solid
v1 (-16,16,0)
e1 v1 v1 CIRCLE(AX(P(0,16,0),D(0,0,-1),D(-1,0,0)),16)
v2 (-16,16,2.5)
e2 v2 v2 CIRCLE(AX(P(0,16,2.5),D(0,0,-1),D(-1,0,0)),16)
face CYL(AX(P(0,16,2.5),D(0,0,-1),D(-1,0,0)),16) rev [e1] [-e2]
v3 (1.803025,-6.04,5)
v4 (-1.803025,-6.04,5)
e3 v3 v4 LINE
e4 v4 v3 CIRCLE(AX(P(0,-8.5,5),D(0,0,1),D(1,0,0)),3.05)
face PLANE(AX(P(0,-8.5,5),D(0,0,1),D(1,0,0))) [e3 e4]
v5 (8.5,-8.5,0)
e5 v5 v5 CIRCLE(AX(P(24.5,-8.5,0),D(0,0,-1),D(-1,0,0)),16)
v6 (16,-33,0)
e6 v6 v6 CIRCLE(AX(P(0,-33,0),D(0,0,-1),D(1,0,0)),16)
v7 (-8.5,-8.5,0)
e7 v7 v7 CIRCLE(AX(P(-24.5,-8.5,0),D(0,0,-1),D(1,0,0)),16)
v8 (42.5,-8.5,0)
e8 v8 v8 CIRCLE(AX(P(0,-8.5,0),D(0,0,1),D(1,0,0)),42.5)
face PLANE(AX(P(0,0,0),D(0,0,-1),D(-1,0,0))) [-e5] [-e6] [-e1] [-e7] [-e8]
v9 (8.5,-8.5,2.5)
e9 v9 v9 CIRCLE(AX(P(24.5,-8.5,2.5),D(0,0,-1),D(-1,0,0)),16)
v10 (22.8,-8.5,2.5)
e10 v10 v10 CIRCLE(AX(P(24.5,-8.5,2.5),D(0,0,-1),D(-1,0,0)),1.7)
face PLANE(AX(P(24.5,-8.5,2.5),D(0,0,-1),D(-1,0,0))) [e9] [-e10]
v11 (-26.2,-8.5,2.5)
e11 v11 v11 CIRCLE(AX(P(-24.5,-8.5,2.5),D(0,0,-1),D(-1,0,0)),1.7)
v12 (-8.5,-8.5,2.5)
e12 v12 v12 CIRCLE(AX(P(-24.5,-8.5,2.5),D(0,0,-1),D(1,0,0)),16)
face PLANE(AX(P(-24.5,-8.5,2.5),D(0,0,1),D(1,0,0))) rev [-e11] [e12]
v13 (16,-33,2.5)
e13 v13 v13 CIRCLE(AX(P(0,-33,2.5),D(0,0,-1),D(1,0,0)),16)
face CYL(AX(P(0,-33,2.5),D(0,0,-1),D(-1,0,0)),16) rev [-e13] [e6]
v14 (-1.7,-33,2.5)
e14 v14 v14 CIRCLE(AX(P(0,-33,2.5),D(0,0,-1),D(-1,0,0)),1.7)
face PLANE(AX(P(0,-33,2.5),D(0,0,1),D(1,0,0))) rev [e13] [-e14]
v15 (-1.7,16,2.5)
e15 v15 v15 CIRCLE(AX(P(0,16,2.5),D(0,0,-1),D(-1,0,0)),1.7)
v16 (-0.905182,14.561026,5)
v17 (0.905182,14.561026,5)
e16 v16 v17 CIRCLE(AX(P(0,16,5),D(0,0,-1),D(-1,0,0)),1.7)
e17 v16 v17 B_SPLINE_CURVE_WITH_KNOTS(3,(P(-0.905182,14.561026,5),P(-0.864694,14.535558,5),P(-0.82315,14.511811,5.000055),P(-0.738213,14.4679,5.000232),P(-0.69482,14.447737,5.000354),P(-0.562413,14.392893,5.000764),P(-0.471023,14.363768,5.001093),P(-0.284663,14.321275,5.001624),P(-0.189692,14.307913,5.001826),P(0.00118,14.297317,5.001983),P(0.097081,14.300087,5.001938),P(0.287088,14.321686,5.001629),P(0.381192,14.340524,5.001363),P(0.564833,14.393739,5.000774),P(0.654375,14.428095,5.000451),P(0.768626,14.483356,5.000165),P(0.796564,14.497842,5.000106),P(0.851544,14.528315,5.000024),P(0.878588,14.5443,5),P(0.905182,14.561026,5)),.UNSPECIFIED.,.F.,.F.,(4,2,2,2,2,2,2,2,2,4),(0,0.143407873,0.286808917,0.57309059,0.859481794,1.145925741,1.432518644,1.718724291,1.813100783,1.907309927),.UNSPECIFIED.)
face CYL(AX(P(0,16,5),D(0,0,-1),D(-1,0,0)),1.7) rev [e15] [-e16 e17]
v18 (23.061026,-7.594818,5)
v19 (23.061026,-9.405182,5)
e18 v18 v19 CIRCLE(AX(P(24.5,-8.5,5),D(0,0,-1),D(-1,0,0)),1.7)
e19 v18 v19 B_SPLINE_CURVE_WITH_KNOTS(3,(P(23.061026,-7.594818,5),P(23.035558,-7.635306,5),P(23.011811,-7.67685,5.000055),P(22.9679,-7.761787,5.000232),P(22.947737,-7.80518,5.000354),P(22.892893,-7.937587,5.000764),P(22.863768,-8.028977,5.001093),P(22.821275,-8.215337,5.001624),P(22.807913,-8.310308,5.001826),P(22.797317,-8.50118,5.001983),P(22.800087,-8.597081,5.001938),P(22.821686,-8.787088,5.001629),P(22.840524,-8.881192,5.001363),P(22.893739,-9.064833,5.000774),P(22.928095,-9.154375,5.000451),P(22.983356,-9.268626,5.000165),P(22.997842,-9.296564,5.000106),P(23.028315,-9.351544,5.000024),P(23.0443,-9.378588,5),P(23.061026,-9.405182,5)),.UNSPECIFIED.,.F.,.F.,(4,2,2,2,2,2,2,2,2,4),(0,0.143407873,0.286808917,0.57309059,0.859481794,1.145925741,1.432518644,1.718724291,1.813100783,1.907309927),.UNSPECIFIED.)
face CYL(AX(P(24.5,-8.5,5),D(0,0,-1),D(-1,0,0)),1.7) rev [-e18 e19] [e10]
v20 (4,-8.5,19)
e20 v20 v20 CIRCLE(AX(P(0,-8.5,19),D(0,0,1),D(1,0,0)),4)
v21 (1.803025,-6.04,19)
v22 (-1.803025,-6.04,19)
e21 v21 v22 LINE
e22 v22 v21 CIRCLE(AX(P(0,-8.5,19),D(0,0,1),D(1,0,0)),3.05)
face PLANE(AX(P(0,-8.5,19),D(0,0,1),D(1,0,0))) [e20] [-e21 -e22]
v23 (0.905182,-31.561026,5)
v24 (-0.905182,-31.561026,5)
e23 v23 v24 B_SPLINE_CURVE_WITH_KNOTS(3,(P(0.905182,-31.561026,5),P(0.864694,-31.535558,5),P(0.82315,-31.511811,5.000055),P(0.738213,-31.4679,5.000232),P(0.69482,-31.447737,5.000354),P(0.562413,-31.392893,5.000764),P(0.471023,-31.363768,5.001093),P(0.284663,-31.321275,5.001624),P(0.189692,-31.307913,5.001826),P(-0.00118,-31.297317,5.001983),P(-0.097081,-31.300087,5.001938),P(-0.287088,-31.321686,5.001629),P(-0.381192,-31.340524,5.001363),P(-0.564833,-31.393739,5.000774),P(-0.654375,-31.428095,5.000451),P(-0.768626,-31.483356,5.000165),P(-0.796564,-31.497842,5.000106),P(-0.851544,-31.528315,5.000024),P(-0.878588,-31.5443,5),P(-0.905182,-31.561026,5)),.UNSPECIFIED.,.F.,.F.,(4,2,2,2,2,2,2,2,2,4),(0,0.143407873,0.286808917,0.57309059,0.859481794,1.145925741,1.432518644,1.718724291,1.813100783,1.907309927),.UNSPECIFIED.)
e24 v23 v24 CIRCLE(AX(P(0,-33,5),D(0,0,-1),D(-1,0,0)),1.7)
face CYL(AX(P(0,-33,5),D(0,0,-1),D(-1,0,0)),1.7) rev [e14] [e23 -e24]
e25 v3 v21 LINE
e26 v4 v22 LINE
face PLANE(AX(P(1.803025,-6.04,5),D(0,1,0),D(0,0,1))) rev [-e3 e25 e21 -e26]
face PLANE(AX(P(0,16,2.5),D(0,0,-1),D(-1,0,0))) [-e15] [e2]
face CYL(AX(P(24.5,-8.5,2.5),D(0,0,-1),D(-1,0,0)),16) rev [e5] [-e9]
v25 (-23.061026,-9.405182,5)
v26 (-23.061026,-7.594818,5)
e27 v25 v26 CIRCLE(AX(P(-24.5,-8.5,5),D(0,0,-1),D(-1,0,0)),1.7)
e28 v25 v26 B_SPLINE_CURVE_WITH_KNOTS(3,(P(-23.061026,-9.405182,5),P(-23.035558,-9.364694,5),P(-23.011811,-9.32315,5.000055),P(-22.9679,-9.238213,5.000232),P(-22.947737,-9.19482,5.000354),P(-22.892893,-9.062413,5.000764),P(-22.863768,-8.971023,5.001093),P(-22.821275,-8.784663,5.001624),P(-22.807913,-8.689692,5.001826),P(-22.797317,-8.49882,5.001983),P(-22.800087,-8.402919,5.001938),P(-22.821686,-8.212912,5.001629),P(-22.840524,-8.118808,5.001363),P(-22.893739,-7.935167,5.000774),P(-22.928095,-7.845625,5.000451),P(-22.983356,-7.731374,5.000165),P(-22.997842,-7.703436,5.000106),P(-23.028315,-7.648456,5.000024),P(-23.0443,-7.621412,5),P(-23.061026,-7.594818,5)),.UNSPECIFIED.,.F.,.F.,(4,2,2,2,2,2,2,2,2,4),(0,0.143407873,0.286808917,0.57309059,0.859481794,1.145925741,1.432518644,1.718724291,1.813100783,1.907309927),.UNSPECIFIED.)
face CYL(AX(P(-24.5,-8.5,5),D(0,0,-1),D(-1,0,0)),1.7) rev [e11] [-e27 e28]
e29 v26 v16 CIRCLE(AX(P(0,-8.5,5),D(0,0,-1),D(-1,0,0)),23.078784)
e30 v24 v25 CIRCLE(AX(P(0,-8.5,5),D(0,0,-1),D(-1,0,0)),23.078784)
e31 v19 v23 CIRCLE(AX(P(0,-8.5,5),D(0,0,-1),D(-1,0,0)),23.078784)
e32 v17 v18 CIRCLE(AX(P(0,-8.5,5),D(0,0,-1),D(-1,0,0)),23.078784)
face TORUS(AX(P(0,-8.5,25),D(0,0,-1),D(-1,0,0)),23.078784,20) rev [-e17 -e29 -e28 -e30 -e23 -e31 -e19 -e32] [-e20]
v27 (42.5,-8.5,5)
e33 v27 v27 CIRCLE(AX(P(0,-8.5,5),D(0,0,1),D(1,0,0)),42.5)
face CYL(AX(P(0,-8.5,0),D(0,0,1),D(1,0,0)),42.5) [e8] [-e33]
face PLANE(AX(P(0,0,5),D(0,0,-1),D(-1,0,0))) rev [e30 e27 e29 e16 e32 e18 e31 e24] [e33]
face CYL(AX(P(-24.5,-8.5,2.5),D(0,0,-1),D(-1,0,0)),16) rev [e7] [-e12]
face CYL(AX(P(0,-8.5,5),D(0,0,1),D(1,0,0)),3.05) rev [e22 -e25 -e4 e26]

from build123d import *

# Parameters (mm, degrees)
BOSS_EXTRUDE2_DEPTH = 5
SKETCH5_R           = 4
BOSS_EXTRUDE3_DEPTH = 7
SKETCH6_R           = 15.5
CUT_EXTRUDE1_DEPTH  = 4
SKETCH7_R           = 1.8
CUT_EXTRUDE2_DEPTH  = 4
CUT_EXTRUDE3_DEPTH  = 6
CUT_EXTRUDE4_DEPTH  = 7
SKETCH11_R          = 4
BOSS_EXTRUDE4_DEPTH = 7
SKETCH12_R          = 42.5
BOSS_EXTRUDE5_DEPTH = 5
SKETCH13_R          = 45.773900861
SKETCH13_R_2        = 42.5
CUT_EXTRUDE5_DEPTH  = 5
SKETCH14_R          = 16
CUT_EXTRUDE6_DEPTH  = 2.5
SKETCH15_R          = 1.7
CUT_EXTRUDE7_DEPTH  = 2.5
CUT_EXTRUDE8_START  = -14
CUT_EXTRUDE8_DEPTH  = 14
FILLET1_R           = 20


with BuildPart() as part:
    # Sketch4 → Boss-Extrude2 (new body)
    with BuildSketch(Plane.XY):
        with BuildLine():
            Line((-17, 0), (-17, 34))
            Line((-17, 34), (17, 34))
            Line((17, 34), (17, 0))
            ThreePointArc((17, 0), (0, -17), (-17, 0))
        make_face()
    extrude(amount=BOSS_EXTRUDE2_DEPTH)

    # Sketch5 → Boss-Extrude3 (add)
    with BuildSketch(Plane.XY.offset(5)):
        with Locations(Location((0, -8.5, 0), (0, 0, 180))):
            Circle(SKETCH5_R)
    extrude(amount=BOSS_EXTRUDE3_DEPTH)

    # Sketch6 → Cut-Extrude1 (cut)
    with BuildSketch(Plane(origin=(0, 0, 0), x_dir=(-1, 0, 0), z_dir=(0, 0, -1))):
        with Locations((0, 17.71586122)):
            Circle(SKETCH6_R)
    extrude(amount=-CUT_EXTRUDE1_DEPTH, mode=Mode.SUBTRACT)

    # Sketch7 → Cut-Extrude2 (cut)
    with BuildSketch(Plane(origin=(0, 0, 4), x_dir=(-1, 0, 0), z_dir=(0, 0, -1))):
        with Locations((0, 17.71586122)):
            Circle(SKETCH7_R)
    extrude(amount=-CUT_EXTRUDE2_DEPTH, mode=Mode.SUBTRACT)

    # Sketch8 → Cut-Extrude3 (cut)
    with BuildSketch(Plane.XY.offset(12)):
        with BuildLine():
            Line((-1.405880507, -7.12), (1.405880507, -7.12))
            ThreePointArc((1.405880507, -7.12), (0, -10.47), (-1.405880507, -7.12))
        make_face()
    extrude(amount=-CUT_EXTRUDE3_DEPTH, mode=Mode.SUBTRACT)

    # Sketch10 → Cut-Extrude4 (cut)
    with BuildSketch(Plane.XY.offset(12)):
        with BuildLine():
            Line((1.439062195, -7.04), (-1.439062195, -7.04))
            ThreePointArc((-1.439062195, -7.04), (0, -10.55), (1.439062195, -7.04))
        make_face()
    extrude(amount=-CUT_EXTRUDE4_DEPTH, mode=Mode.SUBTRACT)

    # Sketch11 → Boss-Extrude4 (add)
    with BuildSketch(Plane.XY.offset(12)):
        with Locations(Location((0, -8.5, 0), (0, 0, 180))):
            Circle(SKETCH11_R)
        with BuildLine():
            Line((1.439062195, -7.04), (-1.439062195, -7.04))
            ThreePointArc((-1.439062195, -7.04), (0, -10.55), (1.439062195, -7.04))
        make_face(mode=Mode.SUBTRACT)
    extrude(amount=BOSS_EXTRUDE4_DEPTH)

    # Sketch12 → Boss-Extrude5 (add)
    with BuildSketch(Plane.XY.offset(5)):
        with Locations((0, -8.5)):
            Circle(SKETCH12_R)
    extrude(amount=-BOSS_EXTRUDE5_DEPTH)

    # Sketch13 → Cut-Extrude5 (cut)
    with BuildSketch(Plane.XY.offset(5)):
        with Locations((0, -8.5)):
            Circle(SKETCH13_R)
        with Locations((0, -8.5)):
            Circle(SKETCH13_R_2, mode=Mode.SUBTRACT)
    extrude(amount=-CUT_EXTRUDE5_DEPTH, mode=Mode.SUBTRACT)

    # Sketch14 → Cut-Extrude6 (cut)
    with BuildSketch(Plane(origin=(0, 0, 0), x_dir=(-1, 0, 0), z_dir=(0, 0, -1))):
        with Locations((0, 16)):
            Circle(SKETCH14_R)
        with Locations(Location((0, -33, 0), (0, 0, 180))):
            Circle(SKETCH14_R)
        with Locations((-24.5, -8.5)):
            Circle(SKETCH14_R)
        with Locations(Location((24.5, -8.5, 0), (0, 0, 180))):
            Circle(SKETCH14_R)
    extrude(amount=-CUT_EXTRUDE6_DEPTH, mode=Mode.SUBTRACT)

    # Sketch15 → Cut-Extrude7 (cut)
    with BuildSketch(Plane(origin=(0, 0, 2.5), x_dir=(-1, 0, 0), z_dir=(0, 0, -1))):
        with Locations((0, 16)):
            Circle(SKETCH15_R)
        with Locations((-24.5, -8.5)):
            Circle(SKETCH15_R)
        with Locations((24.5, -8.5)):
            Circle(SKETCH15_R)
        with Locations((0, -33)):
            Circle(SKETCH15_R)
    extrude(amount=-CUT_EXTRUDE7_DEPTH, mode=Mode.SUBTRACT)

    # Sketch16 → Cut-Extrude8 (cut)
    with BuildSketch(Plane.XY.offset(19).offset(CUT_EXTRUDE8_START)):
        with BuildLine():
            Line((1.803025236, -6.04), (-1.803025236, -6.04))
            ThreePointArc((-1.803025236, -6.04), (0, -11.55), (1.803025236, -6.04))
        make_face()
        with BuildLine():
            Line((1.439062195, -7.04), (-1.439062195, -7.04))
            ThreePointArc((-1.439062195, -7.04), (0, -10.55), (1.439062195, -7.04))
        make_face(mode=Mode.SUBTRACT)
    extrude(amount=CUT_EXTRUDE8_DEPTH, mode=Mode.SUBTRACT)

    # Fillet1
    # the kernel refuses this fillet: 20 mm, written as the material it adds along each edge
    with BuildSketch(Plane(origin=(0, -8.5, 5), x_dir=(-1, 0, 0), z_dir=(0, 1, 0))) as fillet1_piece_1_section:
        with BuildLine():
            CenterArc((23.078784028, 20), FILLET1_R, 197.457603124, 72.542396876)
            Line((4, 14), (3.618424319, 13.88))
            ThreePointArc((3.618424319, 13.88), (3.6, 7), (3.6, 0))
            Line((3.6, 0), (4, -0.4))
            Line((4, -0.4), (23.078784028, -0.4))
            Line((23.078784028, -0.4), (23.078784028, 0))
        make_face()
    fillet1_piece_1 = revolve(axis=Axis((0, -8.5, 5), (0, 0, 1)), mode=Mode.PRIVATE)
    fillet1_piece_1 = fillet1_piece_1 - Plane(origin=(0, -33, 8.742108551), x_dir=(-1, 0, 0), z_dir=(0, 0, -1)) * Cylinder(1.7, 93, mode=Mode.PRIVATE)
    fillet1_piece_1 = fillet1_piece_1 - Plane(origin=(-24.5, -8.5, 8.742108551), x_dir=(-1, 0, 0), z_dir=(0, 0, -1)) * Cylinder(1.7, 93, mode=Mode.PRIVATE)
    fillet1_piece_1 = fillet1_piece_1 - Plane(origin=(0, 16, 8.742108551), x_dir=(-1, 0, 0), z_dir=(0, 0, -1)) * Cylinder(1.7, 93, mode=Mode.PRIVATE)
    fillet1_piece_1 = fillet1_piece_1 - Plane(origin=(24.5, -8.5, 8.742108551), x_dir=(-1, 0, 0), z_dir=(0, 0, -1)) * Cylinder(1.7, 93, mode=Mode.PRIVATE)
    add(fillet1_piece_1)


solid = part.part
